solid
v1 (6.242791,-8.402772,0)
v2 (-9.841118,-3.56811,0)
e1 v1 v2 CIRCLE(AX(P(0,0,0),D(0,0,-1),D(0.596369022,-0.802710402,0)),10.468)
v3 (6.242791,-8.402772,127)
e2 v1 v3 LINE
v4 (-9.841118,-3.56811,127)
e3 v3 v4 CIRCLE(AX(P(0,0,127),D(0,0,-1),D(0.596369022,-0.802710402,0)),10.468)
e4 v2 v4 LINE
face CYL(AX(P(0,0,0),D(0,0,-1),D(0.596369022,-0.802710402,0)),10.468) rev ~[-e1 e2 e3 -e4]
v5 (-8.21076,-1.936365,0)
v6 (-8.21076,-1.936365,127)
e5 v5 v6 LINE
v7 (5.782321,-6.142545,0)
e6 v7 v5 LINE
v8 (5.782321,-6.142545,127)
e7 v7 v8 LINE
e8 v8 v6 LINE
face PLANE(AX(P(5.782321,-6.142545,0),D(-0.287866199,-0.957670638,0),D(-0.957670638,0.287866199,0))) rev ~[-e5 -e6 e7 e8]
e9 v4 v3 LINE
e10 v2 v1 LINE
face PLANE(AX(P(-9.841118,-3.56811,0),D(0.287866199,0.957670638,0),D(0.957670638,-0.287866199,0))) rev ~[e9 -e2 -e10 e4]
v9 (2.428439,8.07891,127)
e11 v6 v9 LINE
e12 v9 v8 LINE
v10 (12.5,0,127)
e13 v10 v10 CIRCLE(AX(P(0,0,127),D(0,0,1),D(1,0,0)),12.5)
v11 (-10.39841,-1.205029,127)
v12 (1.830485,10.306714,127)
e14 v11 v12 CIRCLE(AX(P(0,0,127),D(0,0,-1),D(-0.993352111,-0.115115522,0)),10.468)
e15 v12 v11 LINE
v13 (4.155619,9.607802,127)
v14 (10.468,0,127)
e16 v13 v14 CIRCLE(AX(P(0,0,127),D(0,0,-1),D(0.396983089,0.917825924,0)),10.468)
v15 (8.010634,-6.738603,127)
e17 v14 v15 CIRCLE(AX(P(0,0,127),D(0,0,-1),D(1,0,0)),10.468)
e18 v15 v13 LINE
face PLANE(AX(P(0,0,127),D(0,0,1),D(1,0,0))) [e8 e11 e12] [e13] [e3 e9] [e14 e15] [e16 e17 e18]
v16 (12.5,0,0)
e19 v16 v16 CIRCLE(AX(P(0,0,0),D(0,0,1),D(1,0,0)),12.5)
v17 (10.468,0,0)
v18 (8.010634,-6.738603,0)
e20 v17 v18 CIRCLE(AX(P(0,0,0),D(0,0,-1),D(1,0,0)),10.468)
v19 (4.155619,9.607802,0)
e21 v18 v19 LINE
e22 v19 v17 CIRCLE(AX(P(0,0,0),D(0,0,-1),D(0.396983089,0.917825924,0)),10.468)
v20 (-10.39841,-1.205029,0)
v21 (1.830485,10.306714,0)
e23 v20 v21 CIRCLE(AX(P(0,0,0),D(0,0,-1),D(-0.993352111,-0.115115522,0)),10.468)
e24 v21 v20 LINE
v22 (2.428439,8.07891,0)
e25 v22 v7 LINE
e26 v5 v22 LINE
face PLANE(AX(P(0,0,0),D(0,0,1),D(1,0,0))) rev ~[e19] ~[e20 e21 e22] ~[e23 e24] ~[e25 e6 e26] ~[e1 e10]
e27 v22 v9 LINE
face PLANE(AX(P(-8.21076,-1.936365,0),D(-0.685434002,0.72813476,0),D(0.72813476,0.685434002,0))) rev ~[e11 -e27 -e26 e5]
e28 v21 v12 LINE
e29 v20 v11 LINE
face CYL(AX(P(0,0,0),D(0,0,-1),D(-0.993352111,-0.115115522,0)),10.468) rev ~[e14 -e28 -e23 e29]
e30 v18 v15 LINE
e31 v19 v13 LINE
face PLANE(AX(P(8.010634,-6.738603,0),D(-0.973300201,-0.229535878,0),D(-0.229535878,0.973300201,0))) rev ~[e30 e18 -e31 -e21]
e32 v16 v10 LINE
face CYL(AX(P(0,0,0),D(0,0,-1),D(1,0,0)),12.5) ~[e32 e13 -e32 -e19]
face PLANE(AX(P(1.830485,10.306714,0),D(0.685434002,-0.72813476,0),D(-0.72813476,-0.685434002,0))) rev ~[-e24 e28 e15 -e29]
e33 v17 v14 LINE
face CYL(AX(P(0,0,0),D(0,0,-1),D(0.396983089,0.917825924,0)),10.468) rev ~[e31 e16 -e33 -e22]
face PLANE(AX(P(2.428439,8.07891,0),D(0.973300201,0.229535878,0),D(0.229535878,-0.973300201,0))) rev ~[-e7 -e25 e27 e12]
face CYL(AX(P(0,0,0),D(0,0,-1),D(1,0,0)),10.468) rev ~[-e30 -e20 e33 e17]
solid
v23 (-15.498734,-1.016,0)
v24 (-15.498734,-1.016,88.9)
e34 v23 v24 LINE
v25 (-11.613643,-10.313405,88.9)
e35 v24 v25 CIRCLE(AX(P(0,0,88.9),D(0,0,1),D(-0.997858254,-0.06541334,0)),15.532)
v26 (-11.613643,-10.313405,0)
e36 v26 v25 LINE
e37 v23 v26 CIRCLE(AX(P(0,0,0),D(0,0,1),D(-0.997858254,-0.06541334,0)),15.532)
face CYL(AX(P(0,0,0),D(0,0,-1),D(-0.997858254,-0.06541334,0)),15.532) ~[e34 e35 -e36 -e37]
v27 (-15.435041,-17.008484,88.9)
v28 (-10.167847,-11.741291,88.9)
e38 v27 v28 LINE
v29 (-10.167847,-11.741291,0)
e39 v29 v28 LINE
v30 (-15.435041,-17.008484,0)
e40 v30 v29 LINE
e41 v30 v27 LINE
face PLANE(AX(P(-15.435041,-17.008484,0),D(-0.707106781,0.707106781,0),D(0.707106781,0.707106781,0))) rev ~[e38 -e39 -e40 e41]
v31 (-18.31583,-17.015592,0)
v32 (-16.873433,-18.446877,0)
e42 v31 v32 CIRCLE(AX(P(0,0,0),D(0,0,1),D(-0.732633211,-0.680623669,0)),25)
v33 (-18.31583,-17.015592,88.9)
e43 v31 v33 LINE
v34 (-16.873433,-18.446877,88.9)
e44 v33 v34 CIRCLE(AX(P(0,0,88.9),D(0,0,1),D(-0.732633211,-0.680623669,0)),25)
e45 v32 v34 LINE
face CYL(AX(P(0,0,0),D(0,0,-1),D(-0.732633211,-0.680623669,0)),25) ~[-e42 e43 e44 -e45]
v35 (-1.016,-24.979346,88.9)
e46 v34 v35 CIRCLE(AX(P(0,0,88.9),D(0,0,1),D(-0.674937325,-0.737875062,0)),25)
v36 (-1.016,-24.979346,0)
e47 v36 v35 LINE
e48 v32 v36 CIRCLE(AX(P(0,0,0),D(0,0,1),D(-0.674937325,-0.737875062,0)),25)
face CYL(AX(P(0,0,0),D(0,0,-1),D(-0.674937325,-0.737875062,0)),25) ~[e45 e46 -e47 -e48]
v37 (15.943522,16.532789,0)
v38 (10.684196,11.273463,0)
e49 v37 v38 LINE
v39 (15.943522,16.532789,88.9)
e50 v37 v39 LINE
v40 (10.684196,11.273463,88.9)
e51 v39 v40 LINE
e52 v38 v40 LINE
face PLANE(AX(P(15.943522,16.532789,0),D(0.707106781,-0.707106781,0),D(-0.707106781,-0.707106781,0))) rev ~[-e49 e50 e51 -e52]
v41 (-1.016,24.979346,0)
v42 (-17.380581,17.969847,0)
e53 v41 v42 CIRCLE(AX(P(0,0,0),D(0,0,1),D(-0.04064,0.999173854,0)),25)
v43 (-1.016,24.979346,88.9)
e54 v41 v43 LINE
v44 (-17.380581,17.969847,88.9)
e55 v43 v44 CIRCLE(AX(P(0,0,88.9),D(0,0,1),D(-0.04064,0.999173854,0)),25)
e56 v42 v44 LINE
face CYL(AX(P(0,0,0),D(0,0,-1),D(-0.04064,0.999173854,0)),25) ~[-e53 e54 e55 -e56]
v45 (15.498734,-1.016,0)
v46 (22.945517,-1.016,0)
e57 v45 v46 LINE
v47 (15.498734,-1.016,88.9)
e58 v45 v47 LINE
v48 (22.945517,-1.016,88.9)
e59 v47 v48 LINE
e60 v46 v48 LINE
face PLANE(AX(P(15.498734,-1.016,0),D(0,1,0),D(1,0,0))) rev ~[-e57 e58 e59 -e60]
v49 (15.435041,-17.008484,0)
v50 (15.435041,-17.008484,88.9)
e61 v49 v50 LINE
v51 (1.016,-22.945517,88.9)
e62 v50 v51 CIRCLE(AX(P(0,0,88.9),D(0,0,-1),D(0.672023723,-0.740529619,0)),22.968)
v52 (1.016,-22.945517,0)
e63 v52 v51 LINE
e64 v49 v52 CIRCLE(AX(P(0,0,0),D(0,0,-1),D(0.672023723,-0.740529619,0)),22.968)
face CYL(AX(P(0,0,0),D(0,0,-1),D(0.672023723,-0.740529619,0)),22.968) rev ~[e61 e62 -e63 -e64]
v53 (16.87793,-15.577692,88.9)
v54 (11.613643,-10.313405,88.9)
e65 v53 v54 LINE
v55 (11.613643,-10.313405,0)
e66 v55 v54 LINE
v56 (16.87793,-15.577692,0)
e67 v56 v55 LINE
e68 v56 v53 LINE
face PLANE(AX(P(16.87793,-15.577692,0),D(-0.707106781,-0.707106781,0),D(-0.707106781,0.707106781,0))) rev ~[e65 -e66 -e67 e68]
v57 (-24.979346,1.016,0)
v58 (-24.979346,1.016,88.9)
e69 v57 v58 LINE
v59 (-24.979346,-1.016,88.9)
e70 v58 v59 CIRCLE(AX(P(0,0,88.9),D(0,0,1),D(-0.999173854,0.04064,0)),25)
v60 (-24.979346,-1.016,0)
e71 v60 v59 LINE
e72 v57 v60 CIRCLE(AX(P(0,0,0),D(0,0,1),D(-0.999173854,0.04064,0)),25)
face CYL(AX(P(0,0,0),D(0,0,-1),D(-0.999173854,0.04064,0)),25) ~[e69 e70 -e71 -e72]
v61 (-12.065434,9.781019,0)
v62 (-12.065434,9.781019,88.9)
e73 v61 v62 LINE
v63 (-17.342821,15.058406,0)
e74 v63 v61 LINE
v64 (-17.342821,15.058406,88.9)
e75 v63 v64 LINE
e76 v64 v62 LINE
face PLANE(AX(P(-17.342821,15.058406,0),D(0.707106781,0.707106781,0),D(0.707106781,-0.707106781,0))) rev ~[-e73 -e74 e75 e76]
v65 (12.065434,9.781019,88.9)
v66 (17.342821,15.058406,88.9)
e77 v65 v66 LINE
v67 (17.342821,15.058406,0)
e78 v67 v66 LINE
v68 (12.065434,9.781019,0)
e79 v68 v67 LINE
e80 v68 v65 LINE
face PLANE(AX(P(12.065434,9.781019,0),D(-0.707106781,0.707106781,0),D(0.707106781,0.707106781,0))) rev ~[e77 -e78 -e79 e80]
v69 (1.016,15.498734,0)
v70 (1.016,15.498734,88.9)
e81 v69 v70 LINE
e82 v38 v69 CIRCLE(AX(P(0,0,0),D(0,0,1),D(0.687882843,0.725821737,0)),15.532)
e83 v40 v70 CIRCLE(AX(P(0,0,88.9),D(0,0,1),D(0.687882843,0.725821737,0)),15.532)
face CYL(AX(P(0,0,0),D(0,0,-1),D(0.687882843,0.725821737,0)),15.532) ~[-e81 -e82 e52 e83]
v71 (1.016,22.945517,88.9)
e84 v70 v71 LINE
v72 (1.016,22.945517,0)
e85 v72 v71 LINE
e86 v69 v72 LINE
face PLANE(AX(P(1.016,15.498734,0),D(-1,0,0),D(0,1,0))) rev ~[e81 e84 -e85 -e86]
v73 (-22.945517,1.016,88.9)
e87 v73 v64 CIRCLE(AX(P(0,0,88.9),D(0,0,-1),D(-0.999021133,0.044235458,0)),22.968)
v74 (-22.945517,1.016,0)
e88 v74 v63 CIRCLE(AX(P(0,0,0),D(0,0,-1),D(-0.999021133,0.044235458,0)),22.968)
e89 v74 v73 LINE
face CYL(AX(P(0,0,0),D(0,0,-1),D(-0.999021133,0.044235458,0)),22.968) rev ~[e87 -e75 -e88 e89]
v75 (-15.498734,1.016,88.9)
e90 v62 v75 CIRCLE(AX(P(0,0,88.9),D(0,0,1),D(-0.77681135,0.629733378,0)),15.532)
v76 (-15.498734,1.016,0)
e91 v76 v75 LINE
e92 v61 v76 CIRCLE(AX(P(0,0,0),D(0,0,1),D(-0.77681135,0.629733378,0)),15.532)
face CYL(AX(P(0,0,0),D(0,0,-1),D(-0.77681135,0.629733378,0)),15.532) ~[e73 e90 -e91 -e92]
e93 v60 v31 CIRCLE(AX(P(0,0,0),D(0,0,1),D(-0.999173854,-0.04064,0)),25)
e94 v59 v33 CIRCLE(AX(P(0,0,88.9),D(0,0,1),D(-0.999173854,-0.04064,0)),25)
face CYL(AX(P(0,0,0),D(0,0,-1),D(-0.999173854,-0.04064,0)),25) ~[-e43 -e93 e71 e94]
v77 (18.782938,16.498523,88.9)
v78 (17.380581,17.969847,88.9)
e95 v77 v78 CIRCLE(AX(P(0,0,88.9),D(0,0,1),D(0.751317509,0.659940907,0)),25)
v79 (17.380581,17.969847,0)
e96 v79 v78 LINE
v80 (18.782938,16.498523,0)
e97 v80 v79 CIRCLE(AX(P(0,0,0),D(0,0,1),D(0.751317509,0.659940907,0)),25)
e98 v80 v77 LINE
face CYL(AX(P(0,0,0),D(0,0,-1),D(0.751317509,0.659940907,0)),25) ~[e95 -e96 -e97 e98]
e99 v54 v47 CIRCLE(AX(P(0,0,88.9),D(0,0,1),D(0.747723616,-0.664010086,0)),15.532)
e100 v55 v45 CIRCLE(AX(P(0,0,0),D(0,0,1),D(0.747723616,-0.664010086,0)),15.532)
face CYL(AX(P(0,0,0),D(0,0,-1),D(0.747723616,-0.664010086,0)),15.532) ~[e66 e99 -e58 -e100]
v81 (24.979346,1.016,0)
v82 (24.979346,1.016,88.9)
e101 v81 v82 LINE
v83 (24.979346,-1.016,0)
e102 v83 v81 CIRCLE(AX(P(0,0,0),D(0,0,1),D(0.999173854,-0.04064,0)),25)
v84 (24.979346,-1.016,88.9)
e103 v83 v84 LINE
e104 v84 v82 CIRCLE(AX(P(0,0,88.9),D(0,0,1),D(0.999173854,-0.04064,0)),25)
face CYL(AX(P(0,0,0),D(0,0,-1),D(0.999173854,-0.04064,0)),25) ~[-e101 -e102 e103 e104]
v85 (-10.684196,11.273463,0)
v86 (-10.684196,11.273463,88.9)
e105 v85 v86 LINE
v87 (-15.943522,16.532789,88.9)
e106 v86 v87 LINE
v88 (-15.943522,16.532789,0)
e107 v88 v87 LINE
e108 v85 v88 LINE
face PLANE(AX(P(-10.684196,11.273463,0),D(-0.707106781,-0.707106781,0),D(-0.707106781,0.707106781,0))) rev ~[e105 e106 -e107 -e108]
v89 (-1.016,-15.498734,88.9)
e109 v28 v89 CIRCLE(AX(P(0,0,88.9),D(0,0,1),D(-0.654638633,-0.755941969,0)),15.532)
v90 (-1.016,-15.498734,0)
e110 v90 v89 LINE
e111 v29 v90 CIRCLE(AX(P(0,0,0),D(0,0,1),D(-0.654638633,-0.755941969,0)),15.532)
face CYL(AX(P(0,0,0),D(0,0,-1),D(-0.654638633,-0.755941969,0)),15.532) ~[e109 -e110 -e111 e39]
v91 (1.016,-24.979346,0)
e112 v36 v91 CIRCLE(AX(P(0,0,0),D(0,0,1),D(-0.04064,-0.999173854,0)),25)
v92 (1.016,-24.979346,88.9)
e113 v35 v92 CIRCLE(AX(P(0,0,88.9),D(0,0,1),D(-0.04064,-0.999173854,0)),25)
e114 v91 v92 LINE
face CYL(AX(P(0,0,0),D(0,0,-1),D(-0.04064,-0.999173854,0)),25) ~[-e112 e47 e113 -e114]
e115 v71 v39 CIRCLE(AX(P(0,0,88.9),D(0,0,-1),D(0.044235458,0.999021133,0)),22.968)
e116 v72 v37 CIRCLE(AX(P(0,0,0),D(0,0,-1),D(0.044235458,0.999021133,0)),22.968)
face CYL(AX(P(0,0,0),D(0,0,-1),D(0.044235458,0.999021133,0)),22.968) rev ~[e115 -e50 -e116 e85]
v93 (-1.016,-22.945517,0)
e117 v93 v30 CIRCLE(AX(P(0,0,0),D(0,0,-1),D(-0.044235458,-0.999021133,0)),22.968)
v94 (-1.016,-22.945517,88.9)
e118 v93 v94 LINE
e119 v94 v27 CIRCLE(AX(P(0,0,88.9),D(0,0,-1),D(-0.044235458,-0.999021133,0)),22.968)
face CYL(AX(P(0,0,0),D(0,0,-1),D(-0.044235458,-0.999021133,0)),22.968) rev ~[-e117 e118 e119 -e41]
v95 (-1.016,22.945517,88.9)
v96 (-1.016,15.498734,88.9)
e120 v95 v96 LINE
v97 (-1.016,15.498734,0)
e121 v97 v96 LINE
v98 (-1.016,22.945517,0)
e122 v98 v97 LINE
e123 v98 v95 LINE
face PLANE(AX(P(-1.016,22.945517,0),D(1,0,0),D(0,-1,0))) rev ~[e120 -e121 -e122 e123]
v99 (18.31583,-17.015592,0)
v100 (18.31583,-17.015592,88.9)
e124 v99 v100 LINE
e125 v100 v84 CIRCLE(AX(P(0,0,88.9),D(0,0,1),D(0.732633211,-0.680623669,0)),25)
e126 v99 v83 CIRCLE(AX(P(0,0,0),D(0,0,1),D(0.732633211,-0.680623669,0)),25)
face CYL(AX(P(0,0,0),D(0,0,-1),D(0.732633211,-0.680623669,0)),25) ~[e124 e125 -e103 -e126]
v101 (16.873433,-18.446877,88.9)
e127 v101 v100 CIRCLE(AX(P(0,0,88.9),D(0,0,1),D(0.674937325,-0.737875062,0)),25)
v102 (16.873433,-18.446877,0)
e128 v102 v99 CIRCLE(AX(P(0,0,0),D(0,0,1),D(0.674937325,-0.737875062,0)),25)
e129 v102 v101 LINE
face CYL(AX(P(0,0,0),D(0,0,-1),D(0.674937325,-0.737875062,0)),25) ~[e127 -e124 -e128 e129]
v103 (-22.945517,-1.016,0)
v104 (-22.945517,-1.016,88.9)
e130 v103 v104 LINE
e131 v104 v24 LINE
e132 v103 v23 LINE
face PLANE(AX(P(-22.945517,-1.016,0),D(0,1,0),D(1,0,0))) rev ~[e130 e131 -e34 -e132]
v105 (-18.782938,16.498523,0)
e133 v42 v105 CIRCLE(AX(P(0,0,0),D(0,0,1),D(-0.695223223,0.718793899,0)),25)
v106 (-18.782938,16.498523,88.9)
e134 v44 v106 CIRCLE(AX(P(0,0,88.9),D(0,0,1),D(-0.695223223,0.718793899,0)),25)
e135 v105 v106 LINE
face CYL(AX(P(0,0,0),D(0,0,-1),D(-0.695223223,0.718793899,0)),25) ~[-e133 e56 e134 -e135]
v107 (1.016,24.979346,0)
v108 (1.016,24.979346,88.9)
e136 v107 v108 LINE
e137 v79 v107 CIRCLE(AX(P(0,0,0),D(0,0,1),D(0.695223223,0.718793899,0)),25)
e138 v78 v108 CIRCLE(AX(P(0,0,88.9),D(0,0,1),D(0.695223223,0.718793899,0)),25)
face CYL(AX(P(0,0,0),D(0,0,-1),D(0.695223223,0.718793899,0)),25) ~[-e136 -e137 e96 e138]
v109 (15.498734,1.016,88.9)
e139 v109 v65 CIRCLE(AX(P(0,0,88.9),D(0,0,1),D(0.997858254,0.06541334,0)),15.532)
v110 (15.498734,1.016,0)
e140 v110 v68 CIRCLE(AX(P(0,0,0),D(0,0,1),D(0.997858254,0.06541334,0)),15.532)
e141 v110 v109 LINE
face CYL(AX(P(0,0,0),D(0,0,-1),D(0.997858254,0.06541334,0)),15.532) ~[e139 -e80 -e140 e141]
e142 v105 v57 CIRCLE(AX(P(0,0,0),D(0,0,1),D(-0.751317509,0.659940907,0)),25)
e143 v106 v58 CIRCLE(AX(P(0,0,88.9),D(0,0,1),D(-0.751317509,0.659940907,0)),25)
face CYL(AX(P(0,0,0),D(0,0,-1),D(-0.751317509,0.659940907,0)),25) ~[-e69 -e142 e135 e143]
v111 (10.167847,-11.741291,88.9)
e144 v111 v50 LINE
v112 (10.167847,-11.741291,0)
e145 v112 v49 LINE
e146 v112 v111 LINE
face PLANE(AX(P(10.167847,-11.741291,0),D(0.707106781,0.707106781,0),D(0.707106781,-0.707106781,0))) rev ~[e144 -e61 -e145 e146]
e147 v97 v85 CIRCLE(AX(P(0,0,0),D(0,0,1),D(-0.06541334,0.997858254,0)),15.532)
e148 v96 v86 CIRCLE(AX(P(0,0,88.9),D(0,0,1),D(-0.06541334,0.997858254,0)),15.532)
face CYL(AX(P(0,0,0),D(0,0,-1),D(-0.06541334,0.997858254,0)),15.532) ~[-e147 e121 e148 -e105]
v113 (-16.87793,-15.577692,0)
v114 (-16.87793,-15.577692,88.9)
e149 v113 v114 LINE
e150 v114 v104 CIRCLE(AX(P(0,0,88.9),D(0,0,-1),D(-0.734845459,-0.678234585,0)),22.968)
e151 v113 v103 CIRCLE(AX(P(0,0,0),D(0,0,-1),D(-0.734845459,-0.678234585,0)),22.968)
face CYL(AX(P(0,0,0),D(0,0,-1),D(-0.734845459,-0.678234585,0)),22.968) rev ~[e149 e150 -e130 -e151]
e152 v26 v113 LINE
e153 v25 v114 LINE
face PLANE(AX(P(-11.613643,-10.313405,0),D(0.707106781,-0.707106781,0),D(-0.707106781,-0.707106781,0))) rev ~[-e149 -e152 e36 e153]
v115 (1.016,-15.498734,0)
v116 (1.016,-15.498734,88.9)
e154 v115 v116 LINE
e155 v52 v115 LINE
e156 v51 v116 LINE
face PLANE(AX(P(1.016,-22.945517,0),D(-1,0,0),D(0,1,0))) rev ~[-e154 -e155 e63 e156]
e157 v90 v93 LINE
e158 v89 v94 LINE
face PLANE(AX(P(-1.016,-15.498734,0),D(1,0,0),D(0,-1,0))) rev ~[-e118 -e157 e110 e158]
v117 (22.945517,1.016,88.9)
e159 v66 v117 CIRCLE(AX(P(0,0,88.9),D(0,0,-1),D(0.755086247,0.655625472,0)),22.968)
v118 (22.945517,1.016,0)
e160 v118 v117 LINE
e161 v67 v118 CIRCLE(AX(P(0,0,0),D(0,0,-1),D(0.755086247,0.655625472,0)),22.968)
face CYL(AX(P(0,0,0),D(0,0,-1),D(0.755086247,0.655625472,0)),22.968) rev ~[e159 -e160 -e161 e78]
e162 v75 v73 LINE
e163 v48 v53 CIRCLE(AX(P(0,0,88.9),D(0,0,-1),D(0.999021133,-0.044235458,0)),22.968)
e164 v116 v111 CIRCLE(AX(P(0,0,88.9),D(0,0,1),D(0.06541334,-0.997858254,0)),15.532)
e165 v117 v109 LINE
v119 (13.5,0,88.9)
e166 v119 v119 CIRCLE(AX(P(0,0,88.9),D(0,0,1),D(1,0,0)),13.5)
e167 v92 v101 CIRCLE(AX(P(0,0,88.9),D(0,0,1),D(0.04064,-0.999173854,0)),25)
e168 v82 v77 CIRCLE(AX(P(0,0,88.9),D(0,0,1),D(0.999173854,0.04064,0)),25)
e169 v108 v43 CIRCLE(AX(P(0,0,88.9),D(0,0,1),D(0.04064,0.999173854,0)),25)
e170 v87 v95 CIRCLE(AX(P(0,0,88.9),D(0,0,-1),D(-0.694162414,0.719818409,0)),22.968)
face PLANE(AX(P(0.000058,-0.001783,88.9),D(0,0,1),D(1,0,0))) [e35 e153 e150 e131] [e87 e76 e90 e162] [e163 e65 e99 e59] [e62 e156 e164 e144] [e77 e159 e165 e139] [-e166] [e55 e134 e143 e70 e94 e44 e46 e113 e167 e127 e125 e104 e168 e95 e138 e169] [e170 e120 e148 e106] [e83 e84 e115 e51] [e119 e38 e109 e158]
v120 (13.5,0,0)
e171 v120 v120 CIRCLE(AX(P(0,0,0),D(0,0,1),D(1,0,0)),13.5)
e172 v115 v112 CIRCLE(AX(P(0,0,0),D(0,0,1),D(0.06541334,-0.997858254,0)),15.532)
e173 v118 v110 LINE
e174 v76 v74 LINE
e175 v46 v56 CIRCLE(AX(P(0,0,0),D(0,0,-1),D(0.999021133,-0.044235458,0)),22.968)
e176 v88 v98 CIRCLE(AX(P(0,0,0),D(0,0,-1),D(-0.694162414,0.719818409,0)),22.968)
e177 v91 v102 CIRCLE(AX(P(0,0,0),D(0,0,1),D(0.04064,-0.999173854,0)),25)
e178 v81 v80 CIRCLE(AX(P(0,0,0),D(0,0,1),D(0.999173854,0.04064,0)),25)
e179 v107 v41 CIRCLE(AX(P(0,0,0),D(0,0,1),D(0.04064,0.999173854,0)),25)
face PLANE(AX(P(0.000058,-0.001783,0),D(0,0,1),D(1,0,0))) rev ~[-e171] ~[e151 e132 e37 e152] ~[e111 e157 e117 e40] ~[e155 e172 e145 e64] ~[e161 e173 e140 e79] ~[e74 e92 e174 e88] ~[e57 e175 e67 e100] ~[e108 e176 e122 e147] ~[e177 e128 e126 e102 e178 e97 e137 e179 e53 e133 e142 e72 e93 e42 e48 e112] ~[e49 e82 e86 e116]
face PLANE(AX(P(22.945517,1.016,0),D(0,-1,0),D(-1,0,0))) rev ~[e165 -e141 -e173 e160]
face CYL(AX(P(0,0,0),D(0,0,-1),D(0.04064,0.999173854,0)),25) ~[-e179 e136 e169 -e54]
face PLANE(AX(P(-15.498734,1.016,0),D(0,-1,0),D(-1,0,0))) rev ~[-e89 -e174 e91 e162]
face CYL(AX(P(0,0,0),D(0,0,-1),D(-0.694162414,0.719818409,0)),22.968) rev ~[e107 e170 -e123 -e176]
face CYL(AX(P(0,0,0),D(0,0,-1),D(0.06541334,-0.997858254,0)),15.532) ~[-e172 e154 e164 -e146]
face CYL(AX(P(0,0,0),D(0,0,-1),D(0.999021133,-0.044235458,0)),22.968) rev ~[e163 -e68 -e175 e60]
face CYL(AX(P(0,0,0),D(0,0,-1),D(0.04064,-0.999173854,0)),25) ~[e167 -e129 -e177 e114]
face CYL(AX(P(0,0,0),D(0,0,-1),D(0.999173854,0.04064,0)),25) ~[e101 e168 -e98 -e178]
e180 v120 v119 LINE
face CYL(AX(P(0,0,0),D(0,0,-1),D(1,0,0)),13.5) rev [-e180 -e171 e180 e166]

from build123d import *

# Parameters (mm, degrees)
F0_R     = 13.5
F1_DEPTH = 88.9
F0_R_2   = 12.5
F2_DEPTH = 127


# Not quite as in the source:
# - a feature names something its author has since deleted; it is built from what else it names


with BuildPart() as f1:
    # F0 (on Top) → F1 (new body)
    with BuildSketch(Plane.XY):
        with BuildLine():
            ThreePointArc((15.4987343999, -1.016), (15.5236813723, -0.5082722204), (15.532, 0))
            ThreePointArc((15.532, 0), (15.5236813723, 0.5082722204), (15.4987343999, 1.016))
            ThreePointArc((15.4987343999, 1.016), (14.4620963919, 5.664873516), (12.0654338858, 9.7810188195))
            ThreePointArc((12.0654338858, 9.7810188195), (11.3992660397, 10.549870035), (10.6841963244, 11.2734632169))
            ThreePointArc((10.6841963244, 11.2734632169), (6.2198776234, 14.2322221157), (1.016, 15.4987343999))
            ThreePointArc((1.016, 15.4987343999), (0, 15.532), (-1.016, 15.4987343999))
            ThreePointArc((-1.016, 15.4987343999), (-6.2198776234, 14.2322221157), (-10.6841963244, 11.2734632169))
            ThreePointArc((-10.6841963244, 11.2734632169), (-11.3992660397, 10.549870035), (-12.0654338858, 9.7810188195))
            ThreePointArc((-12.0654338858, 9.7810188195), (-14.4620963919, 5.664873516), (-15.4987343999, 1.016))
            ThreePointArc((-15.4987343999, 1.016), (-15.532, 0), (-15.4987343999, -1.016))
            ThreePointArc((-15.4987343999, -1.016), (-14.3311091034, -5.9885170007), (-11.6136432015, -10.3134046555))
            ThreePointArc((-11.6136432015, -10.3134046555), (-10.9141214099, -11.0510170504), (-10.1678472471, -11.7412906599))
            ThreePointArc((-10.1678472471, -11.7412906599), (-5.8990851559, -14.3681529197), (-1.016, -15.4987343999))
            ThreePointArc((-1.016, -15.4987343999), (0, -15.532), (1.016, -15.4987343999))
            ThreePointArc((1.016, -15.4987343999), (5.8990851559, -14.3681529197), (10.1678472471, -11.7412906599))
            ThreePointArc((10.1678472471, -11.7412906599), (10.9141214099, -11.0510170504), (11.6136432015, -10.3134046555))
            ThreePointArc((11.6136432015, -10.3134046555), (14.3311091034, -5.9885170007), (15.4987343999, -1.016))
        make_face()
        Circle(F0_R, mode=Mode.SUBTRACT)
        with BuildLine():
            ThreePointArc((-12.0654338858, 9.7810188195), (-11.3992660397, 10.549870035), (-10.6841963244, 11.2734632169))
            Line((-10.6841963244, 11.2734632169), (-15.9435223337, 16.5327892262))
            ThreePointArc((-15.9435223337, 16.5327892262), (-16.6594901874, 15.8110850575), (-17.3428209151, 15.0584058488))
            Line((-17.3428209151, 15.0584058488), (-12.0654338858, 9.7810188195))
        make_face()
        with BuildLine():
            ThreePointArc((-17.3428209151, 15.0584058488), (-16.6594901874, 15.8110850575), (-15.9435223337, 16.5327892262))
            Line((-15.9435223337, 16.5327892262), (-17.3805805873, 17.9698474798))
            ThreePointArc((-17.3805805873, 17.9698474798), (-18.0967183071, 17.2484430171), (-18.782937732, 16.4985226658))
            Line((-18.782937732, 16.4985226658), (-17.3428209151, 15.0584058488))
        make_face()
        with BuildLine():
            ThreePointArc((-15.4987343999, -1.016), (-15.532, 0), (-15.4987343999, 1.016))
            Line((-15.4987343999, 1.016), (-22.9455173836, 1.016))
            Line((-22.9455173836, 1.016), (-24.9793463485, 1.016))
            ThreePointArc((-24.9793463485, 1.016), (-25, 0), (-24.9793463485, -1.016))
            Line((-24.9793463485, -1.016), (-22.9455173836, -1.016))
            Line((-22.9455173836, -1.016), (-15.4987343999, -1.016))
        make_face()
        with BuildLine():
            ThreePointArc((10.6841963244, 11.2734632169), (11.3992660397, 10.549870035), (12.0654338858, 9.7810188195))
            Line((12.0654338858, 9.7810188195), (17.3428209151, 15.0584058488))
            ThreePointArc((17.3428209151, 15.0584058488), (16.6594901874, 15.8110850575), (15.9435223337, 16.5327892262))
            Line((15.9435223337, 16.5327892262), (10.6841963244, 11.2734632169))
        make_face()
        with BuildLine():
            ThreePointArc((15.9435223337, 16.5327892262), (16.6594901874, 15.8110850575), (17.3428209151, 15.0584058488))
            Line((17.3428209151, 15.0584058488), (18.782937732, 16.4985226658))
            ThreePointArc((18.782937732, 16.4985226658), (18.0967183071, 17.2484430171), (17.3805805873, 17.9698474798))
            Line((17.3805805873, 17.9698474798), (15.9435223337, 16.5327892262))
        make_face()
        with BuildLine():
            ThreePointArc((15.4987343999, 1.016), (15.5236813723, 0.5082722204), (15.532, 0))
            ThreePointArc((15.532, 0), (15.5236813723, -0.5082722204), (15.4987343999, -1.016))
            Line((15.4987343999, -1.016), (22.9455173836, -1.016))
            ThreePointArc((22.9455173836, -1.016), (22.968, 0), (22.9455173836, 1.016))
            Line((22.9455173836, 1.016), (15.4987343999, 1.016))
        make_face()
        with BuildLine():
            Line((24.9793463485, 1.016), (22.9455173836, 1.016))
            ThreePointArc((22.9455173836, 1.016), (22.968, 0), (22.9455173836, -1.016))
            Line((22.9455173836, -1.016), (24.9793463485, -1.016))
            ThreePointArc((24.9793463485, -1.016), (25, 0), (24.9793463485, 1.016))
        make_face()
        with BuildLine():
            ThreePointArc((-1.016, 15.4987343999), (0, 15.532), (1.016, 15.4987343999))
            Line((1.016, 15.4987343999), (1.016, 22.9455173836))
            ThreePointArc((1.016, 22.9455173836), (0, 22.968), (-1.016, 22.9455173836))
            Line((-1.016, 22.9455173836), (-1.016, 15.4987343999))
        make_face()
        with BuildLine():
            ThreePointArc((-1.016, 22.9455173836), (0, 22.968), (1.016, 22.9455173836))
            Line((1.016, 22.9455173836), (1.016, 24.9793463485))
            ThreePointArc((1.016, 24.9793463485), (0, 25), (-1.016, 24.9793463485))
            Line((-1.016, 24.9793463485), (-1.016, 22.9455173836))
        make_face()
        with BuildLine():
            Line((1.016, -24.9793463485), (1.016, -22.9455173836))
            ThreePointArc((1.016, -22.9455173836), (0, -22.968), (-1.016, -22.9455173836))
            Line((-1.016, -22.9455173836), (-1.016, -24.9793463485))
            ThreePointArc((-1.016, -24.9793463485), (0, -25), (1.016, -24.9793463485))
        make_face()
        with BuildLine():
            Line((1.016, -22.9455173836), (1.016, -15.4987343999))
            ThreePointArc((1.016, -15.4987343999), (0, -15.532), (-1.016, -15.4987343999))
            Line((-1.016, -15.4987343999), (-1.016, -22.9455173836))
            ThreePointArc((-1.016, -22.9455173836), (0, -22.968), (1.016, -22.9455173836))
        make_face()
        with BuildLine():
            Line((-15.4350408661, -17.0084842788), (-10.1678472471, -11.7412906599))
            ThreePointArc((-10.1678472471, -11.7412906599), (-10.9141214099, -11.0510170504), (-11.6136432015, -10.3134046555))
            Line((-11.6136432015, -10.3134046555), (-16.8779304911, -15.5776919451))
            ThreePointArc((-16.8779304911, -15.5776919451), (-16.1723165056, -16.309052788), (-15.4350408661, -17.0084842788))
        make_face()
        with BuildLine():
            Line((-16.8734331332, -18.4468765459), (-15.4350408661, -17.0084842788))
            ThreePointArc((-15.4350408661, -17.0084842788), (-16.1723165056, -16.309052788), (-16.8779304911, -15.5776919451))
            Line((-16.8779304911, -15.5776919451), (-18.3158302672, -17.0155917212))
            ThreePointArc((-18.3158302672, -17.0155917212), (-17.6091796722, -17.7458950542), (-16.8734331332, -18.4468765459))
        make_face()
        with BuildLine():
            Line((16.8779304911, -15.5776919451), (11.6136432015, -10.3134046555))
            ThreePointArc((11.6136432015, -10.3134046555), (10.9141214099, -11.0510170504), (10.1678472471, -11.7412906599))
            Line((10.1678472471, -11.7412906599), (15.4350408661, -17.0084842788))
            ThreePointArc((15.4350408661, -17.0084842788), (16.1723165056, -16.309052788), (16.8779304911, -15.5776919451))
        make_face()
        with BuildLine():
            Line((18.3158302672, -17.0155917212), (16.8779304911, -15.5776919451))
            ThreePointArc((16.8779304911, -15.5776919451), (16.1723165056, -16.309052788), (15.4350408661, -17.0084842788))
            Line((15.4350408661, -17.0084842788), (16.8734331332, -18.4468765459))
            ThreePointArc((16.8734331332, -18.4468765459), (17.6091796722, -17.7458950542), (18.3158302672, -17.0155917212))
        make_face()
        with BuildLine():
            Line((16.8734331332, -18.4468765459), (15.4350408661, -17.0084842788))
            ThreePointArc((15.4350408661, -17.0084842788), (8.7447856987, -21.2381201401), (1.016, -22.9455173836))
            Line((1.016, -22.9455173836), (1.016, -24.9793463485))
            ThreePointArc((1.016, -24.9793463485), (9.5224075153, -23.1154440821), (16.8734331332, -18.4468765459))
        make_face()
        with BuildLine():
            Line((24.9793463485, -1.016), (22.9455173836, -1.016))
            ThreePointArc((22.9455173836, -1.016), (21.2011195042, -8.8341131851), (16.8779304911, -15.5776919451))
            Line((16.8779304911, -15.5776919451), (18.3158302672, -17.0155917212))
            ThreePointArc((18.3158302672, -17.0155917212), (23.0784491108, -9.6117213152), (24.9793463485, -1.016))
        make_face()
        with BuildLine():
            ThreePointArc((17.3428209151, 15.0584058488), (21.3327176239, 8.5114148517), (22.9455173836, 1.016))
            Line((22.9455173836, 1.016), (24.9793463485, 1.016))
            ThreePointArc((24.9793463485, 1.016), (23.2101594999, 9.2891601336), (18.782937732, 16.4985226658))
            Line((18.782937732, 16.4985226658), (17.3428209151, 15.0584058488))
        make_face()
        with BuildLine():
            Line((-1.016, -24.9793463485), (-1.016, -22.9455173836))
            ThreePointArc((-1.016, -22.9455173836), (-8.7447856987, -21.2381201401), (-15.4350408661, -17.0084842788))
            Line((-15.4350408661, -17.0084842788), (-16.8734331332, -18.4468765459))
            ThreePointArc((-16.8734331332, -18.4468765459), (-9.5224075153, -23.1154440821), (-1.016, -24.9793463485))
        make_face()
        with BuildLine():
            Line((-18.3158302672, -17.0155917212), (-16.8779304911, -15.5776919451))
            ThreePointArc((-16.8779304911, -15.5776919451), (-21.2011195042, -8.8341131851), (-22.9455173836, -1.016))
            Line((-22.9455173836, -1.016), (-24.9793463485, -1.016))
            ThreePointArc((-24.9793463485, -1.016), (-23.0784491108, -9.6117213152), (-18.3158302672, -17.0155917212))
        make_face()
        with BuildLine():
            ThreePointArc((-22.9455173836, 1.016), (-21.3327176239, 8.5114148517), (-17.3428209151, 15.0584058488))
            Line((-17.3428209151, 15.0584058488), (-18.782937732, 16.4985226658))
            ThreePointArc((-18.782937732, 16.4985226658), (-23.2101594999, 9.2891601336), (-24.9793463485, 1.016))
            Line((-24.9793463485, 1.016), (-22.9455173836, 1.016))
        make_face()
        with BuildLine():
            ThreePointArc((-15.9435223337, 16.5327892262), (-9.065711227, 21.1031254545), (-1.016, 22.9455173836))
            Line((-1.016, 22.9455173836), (-1.016, 24.9793463485))
            ThreePointArc((-1.016, 24.9793463485), (-9.8433639029, 22.9806045846), (-17.3805805873, 17.9698474798))
            Line((-17.3805805873, 17.9698474798), (-15.9435223337, 16.5327892262))
        make_face()
        with BuildLine():
            ThreePointArc((1.016, 22.9455173836), (9.065711227, 21.1031254545), (15.9435223337, 16.5327892262))
            Line((15.9435223337, 16.5327892262), (17.3805805873, 17.9698474798))
            ThreePointArc((17.3805805873, 17.9698474798), (9.8433639029, 22.9806045846), (1.016, 24.9793463485))
            Line((1.016, 24.9793463485), (1.016, 22.9455173836))
        make_face()
    extrude(amount=F1_DEPTH)


with BuildPart() as f2:
    # F0 (on Top) → F2 (new body)
    with BuildSketch(Plane.XY):
        Circle(F0_R_2)
        with BuildLine():
            ThreePointArc((4.1556189742, 9.6078017747), (8.748715432, 5.7479563576), (10.468, 0))
            ThreePointArc((10.468, 0), (9.8344886963, -3.5863429958), (8.010633534, -6.7386032963))
            ThreePointArc((8.010633534, -6.7386032963), (7.1751231328, -7.6221146691), (6.2427909243, -8.4027724874))
            ThreePointArc((6.2427909243, -8.4027724874), (-3.0133833676, -10.0248962428), (-9.8411184076, -3.5681104927))
            ThreePointArc((-9.8411184076, -3.5681104927), (-10.1885065004, -2.4027815737), (-10.3984098985, -1.2050292872))
            ThreePointArc((-10.3984098985, -1.2050292872), (-7.1751231328, 7.6221146691), (1.8304848736, 10.306713789))
            ThreePointArc((1.8304848736, 10.306713789), (3.0133833676, 10.0248962428), (4.1556189742, 9.6078017747))
        make_face(mode=Mode.SUBTRACT)
        with BuildLine():
            Line((8.010633534, -6.7386032963), (4.1556189742, 9.6078017747))
            ThreePointArc((4.1556189742, 9.6078017747), (3.0133833676, 10.0248962428), (1.8304848736, 10.306713789))
            Line((1.8304848736, 10.306713789), (-10.3984098985, -1.2050292872))
            ThreePointArc((-10.3984098985, -1.2050292872), (-10.1885065004, -2.4027815737), (-9.8411184076, -3.5681104927))
            Line((-9.8411184076, -3.5681104927), (6.2427909243, -8.4027724874))
            ThreePointArc((6.2427909243, -8.4027724874), (7.1751231328, -7.6221146691), (8.010633534, -6.7386032963))
        make_face()
        Polygon((5.7823212408, -6.1425448365), (-8.2107604927, -1.9363646691), (2.4284392519, 8.0789095056), align=None, mode=Mode.SUBTRACT)
    extrude(amount=F2_DEPTH)


solid = Compound([f1.part, f2.part])
